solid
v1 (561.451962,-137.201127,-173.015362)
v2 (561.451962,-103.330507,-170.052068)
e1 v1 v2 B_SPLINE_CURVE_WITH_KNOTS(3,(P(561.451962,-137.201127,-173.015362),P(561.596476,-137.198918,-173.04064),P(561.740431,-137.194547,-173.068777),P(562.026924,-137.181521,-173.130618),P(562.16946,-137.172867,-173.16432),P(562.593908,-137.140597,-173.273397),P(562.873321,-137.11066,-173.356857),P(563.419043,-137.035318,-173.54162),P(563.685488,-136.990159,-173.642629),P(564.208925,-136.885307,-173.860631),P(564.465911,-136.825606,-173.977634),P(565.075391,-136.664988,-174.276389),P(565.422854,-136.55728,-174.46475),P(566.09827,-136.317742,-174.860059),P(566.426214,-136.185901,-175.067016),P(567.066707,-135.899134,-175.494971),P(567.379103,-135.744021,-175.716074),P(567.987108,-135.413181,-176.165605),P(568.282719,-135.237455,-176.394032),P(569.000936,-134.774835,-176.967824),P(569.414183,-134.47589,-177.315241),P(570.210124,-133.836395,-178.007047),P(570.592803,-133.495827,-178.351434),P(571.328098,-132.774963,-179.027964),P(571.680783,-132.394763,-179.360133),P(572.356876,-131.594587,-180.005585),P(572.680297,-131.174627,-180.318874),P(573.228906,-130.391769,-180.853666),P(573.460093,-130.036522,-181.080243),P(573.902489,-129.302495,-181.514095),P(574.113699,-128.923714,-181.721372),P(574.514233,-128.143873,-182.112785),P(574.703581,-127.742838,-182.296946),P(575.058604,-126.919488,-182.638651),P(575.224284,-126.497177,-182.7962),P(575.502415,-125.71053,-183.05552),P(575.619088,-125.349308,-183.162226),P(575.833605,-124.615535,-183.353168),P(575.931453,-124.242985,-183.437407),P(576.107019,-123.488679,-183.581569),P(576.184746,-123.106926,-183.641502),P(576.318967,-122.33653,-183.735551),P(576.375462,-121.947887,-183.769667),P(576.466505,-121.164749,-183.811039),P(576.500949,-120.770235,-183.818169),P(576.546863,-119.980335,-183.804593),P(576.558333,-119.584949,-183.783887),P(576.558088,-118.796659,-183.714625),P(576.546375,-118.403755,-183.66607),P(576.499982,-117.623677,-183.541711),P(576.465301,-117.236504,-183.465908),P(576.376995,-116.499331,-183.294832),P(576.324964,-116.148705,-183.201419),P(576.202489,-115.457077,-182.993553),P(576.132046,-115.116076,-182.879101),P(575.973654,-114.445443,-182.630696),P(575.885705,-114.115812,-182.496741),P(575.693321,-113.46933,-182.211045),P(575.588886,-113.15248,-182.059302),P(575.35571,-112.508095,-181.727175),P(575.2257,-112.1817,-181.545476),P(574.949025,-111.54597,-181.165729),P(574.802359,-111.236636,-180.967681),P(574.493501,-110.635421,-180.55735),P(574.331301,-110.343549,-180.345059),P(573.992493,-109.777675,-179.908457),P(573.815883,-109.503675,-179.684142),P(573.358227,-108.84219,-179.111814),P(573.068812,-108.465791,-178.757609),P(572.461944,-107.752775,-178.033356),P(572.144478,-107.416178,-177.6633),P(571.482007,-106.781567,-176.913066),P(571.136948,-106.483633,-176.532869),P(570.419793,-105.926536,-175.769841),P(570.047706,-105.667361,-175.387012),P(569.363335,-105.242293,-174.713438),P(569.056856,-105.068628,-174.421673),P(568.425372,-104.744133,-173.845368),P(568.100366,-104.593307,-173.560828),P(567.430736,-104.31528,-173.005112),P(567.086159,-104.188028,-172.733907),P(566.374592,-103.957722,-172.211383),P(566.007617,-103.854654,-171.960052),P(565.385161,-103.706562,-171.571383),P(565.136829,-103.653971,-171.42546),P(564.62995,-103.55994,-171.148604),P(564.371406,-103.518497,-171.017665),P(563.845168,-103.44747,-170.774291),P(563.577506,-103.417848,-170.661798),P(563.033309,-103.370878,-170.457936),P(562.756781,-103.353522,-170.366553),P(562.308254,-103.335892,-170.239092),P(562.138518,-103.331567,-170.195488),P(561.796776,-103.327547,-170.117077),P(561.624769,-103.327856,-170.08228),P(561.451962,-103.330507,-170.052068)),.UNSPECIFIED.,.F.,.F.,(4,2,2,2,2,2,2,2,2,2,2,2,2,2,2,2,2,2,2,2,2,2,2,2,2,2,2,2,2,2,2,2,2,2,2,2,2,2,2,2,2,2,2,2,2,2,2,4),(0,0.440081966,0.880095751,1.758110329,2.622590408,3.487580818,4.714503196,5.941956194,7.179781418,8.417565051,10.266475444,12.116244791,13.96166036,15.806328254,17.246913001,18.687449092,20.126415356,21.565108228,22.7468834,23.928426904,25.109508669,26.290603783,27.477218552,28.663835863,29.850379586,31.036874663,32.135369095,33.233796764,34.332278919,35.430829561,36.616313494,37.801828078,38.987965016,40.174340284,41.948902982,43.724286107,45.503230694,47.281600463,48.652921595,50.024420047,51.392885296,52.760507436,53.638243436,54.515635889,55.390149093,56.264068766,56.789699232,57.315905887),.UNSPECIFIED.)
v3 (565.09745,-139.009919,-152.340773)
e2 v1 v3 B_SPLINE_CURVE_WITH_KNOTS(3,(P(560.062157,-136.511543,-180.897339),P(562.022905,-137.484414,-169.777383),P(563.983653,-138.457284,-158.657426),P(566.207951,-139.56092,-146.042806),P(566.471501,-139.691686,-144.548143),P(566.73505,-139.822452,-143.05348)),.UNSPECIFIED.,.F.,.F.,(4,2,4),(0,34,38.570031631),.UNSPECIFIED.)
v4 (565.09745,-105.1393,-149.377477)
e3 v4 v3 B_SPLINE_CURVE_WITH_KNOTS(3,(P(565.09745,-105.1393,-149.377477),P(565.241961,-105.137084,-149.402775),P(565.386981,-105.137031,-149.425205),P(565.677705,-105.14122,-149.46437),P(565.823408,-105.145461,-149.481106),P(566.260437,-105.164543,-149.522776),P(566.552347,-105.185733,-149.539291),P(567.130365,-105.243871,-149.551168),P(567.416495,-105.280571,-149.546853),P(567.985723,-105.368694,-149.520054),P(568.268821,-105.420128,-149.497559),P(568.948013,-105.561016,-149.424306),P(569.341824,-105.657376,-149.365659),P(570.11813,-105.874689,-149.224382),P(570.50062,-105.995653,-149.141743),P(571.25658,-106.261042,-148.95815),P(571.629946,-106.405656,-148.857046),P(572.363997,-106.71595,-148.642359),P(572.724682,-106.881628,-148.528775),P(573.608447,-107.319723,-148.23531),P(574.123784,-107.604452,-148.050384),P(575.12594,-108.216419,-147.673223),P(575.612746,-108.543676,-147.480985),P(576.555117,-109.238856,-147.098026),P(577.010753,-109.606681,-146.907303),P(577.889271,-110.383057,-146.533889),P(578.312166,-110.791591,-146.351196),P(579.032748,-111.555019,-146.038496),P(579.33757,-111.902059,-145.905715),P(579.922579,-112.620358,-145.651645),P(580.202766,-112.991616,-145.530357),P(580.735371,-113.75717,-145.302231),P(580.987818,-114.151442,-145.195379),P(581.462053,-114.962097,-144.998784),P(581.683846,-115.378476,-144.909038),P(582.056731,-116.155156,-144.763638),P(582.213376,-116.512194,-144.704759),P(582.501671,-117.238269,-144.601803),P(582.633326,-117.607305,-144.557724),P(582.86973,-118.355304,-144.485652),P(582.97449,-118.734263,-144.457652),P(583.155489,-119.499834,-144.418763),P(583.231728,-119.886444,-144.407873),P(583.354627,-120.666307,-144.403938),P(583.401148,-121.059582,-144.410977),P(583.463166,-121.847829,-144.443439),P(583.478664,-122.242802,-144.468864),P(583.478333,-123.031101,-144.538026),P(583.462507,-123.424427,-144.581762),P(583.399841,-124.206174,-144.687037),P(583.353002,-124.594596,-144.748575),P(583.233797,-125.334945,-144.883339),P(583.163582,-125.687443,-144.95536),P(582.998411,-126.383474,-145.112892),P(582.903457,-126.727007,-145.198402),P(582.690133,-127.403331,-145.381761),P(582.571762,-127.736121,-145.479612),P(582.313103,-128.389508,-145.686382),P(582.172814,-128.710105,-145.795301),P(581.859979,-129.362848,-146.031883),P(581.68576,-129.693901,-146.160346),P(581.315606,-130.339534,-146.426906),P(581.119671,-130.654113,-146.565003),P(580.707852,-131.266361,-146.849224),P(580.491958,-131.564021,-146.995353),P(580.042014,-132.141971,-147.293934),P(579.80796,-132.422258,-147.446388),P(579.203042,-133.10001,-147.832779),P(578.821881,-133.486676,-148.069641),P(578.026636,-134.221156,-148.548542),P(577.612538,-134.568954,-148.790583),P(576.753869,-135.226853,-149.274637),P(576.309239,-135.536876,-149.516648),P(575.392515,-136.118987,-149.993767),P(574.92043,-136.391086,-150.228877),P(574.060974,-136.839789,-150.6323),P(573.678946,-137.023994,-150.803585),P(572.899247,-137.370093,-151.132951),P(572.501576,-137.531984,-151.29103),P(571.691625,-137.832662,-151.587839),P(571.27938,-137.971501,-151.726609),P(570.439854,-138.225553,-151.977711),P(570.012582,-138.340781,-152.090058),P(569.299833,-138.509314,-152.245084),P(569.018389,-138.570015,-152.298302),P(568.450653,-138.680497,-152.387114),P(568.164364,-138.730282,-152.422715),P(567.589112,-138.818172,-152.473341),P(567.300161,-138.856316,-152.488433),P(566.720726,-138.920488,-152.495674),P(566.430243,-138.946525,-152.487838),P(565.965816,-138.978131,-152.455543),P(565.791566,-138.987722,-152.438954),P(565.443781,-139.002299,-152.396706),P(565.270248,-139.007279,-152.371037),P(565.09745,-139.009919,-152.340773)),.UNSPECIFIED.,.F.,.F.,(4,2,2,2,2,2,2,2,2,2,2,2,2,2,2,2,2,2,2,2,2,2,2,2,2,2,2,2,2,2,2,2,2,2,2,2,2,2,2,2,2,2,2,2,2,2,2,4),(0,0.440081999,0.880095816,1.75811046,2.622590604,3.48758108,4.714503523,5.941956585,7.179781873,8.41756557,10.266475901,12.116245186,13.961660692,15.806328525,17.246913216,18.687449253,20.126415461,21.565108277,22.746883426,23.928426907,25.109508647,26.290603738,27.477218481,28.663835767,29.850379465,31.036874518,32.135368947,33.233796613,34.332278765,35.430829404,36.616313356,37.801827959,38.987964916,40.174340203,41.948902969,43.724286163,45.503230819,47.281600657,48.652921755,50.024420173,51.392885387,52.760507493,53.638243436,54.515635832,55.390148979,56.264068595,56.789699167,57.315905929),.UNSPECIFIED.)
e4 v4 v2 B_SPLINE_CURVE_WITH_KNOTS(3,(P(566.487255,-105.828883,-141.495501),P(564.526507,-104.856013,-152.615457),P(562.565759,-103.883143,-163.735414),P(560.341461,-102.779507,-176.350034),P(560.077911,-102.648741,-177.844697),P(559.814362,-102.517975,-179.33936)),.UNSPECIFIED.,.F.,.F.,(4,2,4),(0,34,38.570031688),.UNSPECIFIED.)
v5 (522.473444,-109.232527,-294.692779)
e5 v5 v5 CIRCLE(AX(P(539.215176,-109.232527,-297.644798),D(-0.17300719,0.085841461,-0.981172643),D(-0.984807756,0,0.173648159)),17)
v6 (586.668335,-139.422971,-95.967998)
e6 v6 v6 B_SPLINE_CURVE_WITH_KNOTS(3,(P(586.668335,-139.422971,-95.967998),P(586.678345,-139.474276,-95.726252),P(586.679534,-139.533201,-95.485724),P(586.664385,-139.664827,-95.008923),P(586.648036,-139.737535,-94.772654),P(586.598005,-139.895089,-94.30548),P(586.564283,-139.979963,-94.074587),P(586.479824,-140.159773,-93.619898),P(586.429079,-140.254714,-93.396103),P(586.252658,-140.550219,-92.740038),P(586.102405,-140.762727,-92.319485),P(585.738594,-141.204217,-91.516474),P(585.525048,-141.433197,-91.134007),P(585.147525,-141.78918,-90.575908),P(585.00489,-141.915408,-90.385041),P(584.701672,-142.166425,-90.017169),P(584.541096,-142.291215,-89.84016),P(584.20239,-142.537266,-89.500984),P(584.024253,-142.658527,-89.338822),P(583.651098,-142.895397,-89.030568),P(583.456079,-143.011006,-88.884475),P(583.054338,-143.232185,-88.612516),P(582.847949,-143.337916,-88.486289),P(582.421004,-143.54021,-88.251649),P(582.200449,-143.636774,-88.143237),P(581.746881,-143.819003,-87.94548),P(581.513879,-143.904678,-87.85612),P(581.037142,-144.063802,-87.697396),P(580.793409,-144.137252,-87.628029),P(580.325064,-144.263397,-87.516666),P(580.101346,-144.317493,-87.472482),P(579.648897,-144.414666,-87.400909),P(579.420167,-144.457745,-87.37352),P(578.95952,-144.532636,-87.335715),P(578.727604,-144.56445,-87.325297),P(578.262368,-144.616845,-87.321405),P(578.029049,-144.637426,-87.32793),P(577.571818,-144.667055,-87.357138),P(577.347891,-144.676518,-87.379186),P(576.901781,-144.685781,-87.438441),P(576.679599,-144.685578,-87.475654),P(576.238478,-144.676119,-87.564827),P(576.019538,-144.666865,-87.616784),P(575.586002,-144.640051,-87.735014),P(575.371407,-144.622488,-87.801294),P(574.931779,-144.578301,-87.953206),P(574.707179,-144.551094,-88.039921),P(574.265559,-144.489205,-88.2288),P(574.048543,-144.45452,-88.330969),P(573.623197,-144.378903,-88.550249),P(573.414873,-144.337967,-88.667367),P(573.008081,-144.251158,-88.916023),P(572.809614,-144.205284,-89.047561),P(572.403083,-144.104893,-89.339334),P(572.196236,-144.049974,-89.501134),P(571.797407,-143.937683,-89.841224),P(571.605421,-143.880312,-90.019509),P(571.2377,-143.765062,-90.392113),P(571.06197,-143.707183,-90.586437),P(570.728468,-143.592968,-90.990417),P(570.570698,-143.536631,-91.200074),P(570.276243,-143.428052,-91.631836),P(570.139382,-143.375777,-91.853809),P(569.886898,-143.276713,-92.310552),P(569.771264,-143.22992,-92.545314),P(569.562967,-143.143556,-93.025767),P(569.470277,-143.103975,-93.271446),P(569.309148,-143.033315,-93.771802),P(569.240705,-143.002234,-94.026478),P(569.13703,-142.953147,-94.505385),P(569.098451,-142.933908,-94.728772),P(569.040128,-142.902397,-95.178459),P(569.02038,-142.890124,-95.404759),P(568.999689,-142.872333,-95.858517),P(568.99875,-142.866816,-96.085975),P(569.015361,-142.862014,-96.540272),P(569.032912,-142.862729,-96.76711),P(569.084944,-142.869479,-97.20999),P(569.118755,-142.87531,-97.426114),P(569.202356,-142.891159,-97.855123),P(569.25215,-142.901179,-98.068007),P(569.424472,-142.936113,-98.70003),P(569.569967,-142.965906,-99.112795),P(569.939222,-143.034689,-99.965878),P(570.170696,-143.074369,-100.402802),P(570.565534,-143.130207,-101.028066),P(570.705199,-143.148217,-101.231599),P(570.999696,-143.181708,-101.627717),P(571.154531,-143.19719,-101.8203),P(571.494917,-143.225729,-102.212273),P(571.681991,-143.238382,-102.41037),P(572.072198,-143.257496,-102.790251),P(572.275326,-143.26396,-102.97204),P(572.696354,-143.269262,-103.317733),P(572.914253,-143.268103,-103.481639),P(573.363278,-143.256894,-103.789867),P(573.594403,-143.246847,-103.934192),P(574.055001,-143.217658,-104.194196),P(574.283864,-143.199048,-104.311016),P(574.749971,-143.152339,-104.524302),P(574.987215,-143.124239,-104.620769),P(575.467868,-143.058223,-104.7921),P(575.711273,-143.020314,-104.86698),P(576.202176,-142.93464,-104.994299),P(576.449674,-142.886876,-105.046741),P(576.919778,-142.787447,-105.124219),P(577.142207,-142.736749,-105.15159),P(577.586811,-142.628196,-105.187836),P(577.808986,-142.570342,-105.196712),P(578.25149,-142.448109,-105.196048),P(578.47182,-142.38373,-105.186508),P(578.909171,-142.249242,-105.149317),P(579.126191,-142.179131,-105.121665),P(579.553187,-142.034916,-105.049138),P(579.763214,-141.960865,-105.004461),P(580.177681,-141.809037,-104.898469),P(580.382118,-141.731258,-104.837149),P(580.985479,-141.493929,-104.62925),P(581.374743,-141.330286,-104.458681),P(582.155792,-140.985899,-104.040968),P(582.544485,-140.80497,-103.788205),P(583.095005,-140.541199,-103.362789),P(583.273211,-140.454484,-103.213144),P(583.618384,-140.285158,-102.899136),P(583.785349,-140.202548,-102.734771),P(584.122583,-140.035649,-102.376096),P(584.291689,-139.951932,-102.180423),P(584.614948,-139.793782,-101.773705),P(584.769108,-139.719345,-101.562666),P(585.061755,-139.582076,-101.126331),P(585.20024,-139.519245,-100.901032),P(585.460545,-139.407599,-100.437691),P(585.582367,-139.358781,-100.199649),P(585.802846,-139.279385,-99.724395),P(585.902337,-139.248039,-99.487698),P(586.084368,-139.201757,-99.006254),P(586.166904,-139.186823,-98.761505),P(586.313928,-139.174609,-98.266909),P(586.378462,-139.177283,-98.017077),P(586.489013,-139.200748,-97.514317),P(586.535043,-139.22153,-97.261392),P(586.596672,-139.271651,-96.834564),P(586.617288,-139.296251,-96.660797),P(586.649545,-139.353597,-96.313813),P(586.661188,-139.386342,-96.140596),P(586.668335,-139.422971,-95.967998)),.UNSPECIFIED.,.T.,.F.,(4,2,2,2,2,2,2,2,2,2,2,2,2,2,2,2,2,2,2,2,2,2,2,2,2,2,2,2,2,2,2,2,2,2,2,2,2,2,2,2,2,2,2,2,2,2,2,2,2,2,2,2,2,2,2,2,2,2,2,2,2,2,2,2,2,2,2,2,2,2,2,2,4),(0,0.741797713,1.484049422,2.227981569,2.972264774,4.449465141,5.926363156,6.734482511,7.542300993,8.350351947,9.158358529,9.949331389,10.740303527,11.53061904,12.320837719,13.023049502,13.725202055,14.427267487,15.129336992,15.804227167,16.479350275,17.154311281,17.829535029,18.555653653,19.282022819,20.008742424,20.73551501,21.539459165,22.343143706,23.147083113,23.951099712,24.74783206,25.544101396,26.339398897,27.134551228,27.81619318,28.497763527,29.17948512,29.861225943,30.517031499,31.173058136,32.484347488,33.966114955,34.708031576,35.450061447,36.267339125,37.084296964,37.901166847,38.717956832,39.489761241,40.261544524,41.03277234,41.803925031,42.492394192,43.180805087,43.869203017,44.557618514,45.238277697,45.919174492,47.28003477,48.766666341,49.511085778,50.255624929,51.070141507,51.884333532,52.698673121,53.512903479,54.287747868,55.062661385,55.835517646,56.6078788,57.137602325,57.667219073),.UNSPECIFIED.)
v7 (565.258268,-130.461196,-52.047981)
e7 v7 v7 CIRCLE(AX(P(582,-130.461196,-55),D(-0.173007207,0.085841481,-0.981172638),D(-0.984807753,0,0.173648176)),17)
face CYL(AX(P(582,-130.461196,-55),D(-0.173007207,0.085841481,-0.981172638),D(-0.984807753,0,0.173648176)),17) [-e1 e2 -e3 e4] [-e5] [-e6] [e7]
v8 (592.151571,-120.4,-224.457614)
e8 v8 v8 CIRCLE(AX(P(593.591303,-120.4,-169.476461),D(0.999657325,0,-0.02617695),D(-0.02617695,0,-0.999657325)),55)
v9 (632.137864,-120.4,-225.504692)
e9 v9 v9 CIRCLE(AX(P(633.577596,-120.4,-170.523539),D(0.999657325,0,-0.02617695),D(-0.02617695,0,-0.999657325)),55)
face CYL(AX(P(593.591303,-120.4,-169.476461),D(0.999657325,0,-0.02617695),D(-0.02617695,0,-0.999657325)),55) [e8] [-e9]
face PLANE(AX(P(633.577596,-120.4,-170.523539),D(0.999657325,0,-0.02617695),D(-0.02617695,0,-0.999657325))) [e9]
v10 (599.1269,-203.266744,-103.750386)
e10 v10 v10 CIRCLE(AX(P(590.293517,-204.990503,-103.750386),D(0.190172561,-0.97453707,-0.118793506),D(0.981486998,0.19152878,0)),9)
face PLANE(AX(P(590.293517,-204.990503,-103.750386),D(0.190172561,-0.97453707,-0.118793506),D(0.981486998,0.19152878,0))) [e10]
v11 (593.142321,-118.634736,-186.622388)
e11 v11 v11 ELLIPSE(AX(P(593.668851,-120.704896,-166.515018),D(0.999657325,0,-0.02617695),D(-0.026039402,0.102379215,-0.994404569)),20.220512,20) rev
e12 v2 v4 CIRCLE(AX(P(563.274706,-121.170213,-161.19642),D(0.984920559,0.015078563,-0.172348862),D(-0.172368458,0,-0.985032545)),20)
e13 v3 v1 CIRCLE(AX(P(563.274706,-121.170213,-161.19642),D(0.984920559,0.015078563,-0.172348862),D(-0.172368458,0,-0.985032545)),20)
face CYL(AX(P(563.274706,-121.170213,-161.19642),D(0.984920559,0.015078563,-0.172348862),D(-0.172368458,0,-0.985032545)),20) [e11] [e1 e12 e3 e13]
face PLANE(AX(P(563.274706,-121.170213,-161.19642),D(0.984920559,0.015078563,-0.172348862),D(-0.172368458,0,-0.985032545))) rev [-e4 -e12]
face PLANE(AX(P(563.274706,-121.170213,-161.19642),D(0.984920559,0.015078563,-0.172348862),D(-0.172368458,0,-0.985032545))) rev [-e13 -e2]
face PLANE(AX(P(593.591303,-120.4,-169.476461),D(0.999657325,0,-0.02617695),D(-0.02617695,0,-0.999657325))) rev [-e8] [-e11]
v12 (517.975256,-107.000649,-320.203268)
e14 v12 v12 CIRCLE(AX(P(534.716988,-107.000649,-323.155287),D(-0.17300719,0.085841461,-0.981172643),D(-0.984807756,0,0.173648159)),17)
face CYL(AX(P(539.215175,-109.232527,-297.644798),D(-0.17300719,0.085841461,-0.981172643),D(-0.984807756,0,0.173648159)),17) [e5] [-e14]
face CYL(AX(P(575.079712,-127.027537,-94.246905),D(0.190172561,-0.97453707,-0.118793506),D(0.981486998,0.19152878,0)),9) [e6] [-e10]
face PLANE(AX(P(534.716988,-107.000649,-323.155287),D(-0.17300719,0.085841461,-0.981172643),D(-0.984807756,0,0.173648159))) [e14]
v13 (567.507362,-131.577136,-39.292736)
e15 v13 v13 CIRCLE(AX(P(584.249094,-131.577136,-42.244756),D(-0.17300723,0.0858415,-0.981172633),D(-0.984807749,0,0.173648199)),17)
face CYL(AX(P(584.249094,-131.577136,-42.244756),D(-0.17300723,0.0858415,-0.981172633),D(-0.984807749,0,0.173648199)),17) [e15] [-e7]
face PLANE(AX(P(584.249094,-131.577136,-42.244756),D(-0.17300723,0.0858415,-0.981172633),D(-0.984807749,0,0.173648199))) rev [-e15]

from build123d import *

# Parameters (mm, degrees)
SUSP_FR_UCA_BALL_JOINT_PROFILE_R  = 17
SUSP_FR_LCA_BALL_JOINT_PROFILE_R  = 17
SUSP_FR_UPRIGHT_KINGPIN_START     = -189.376138003
SUSP_FR_UPRIGHT_KINGPIN_OUTLINE_R = 17
SUSP_FR_UPRIGHT_KINGPIN_DEPTH     = 234.300819272
SUSP_FR_UPRIGHT_SPINDLE_PROFILE_R = 20
SUSP_FR_UPRIGHT_ARM_PROFILE_R     = 9
SUSP_FR_HUB_PROFILE_R             = 55


# Read off the part's stored shape, not the designer's step: SUSP_FR_upright_kingpin
with BuildPart() as part:
    # SUSP_FR_UCA_ball_joint: sweep along a curve in space
    with BuildLine() as susp_fr_uca_ball_joint_path:
        Line((539.215175, -109.232527, -297.644798), (534.716988, -107.000649, -323.155287))
    # SUSP_FR_UCA_ball_joint profile (on start of the path) → SUSP_FR_UCA_ball_joint (sweep)
    with BuildSketch(Plane(origin=(539.215175, -109.232527, -297.644798), x_dir=(-0.9848077563247088, 0, 0.17364815888080395), z_dir=(-0.1730071904249639, 0.0858414606043016, -0.981172643168663))):
        Circle(SUSP_FR_UCA_BALL_JOINT_PROFILE_R)
    sweep(path=susp_fr_uca_ball_joint_path.line)


with BuildPart() as body_2:
    # SUSP_FR_LCA_ball_joint: sweep along a curve in space
    with BuildLine() as susp_fr_lca_ball_joint_path:
        Line((584.249094, -131.577136, -42.2447557), (579.750906, -129.345257, -67.7552443))
    # SUSP_FR_LCA_ball_joint profile (on start of the path) → SUSP_FR_LCA_ball_joint (sweep)
    with BuildSketch(Plane(origin=(584.249094, -131.577136, -42.2447557), x_dir=(-0.9848077492574088, 0, 0.17364819896145425), z_dir=(-0.17300722977562832, 0.08584149950700166, -0.9811726328265339))):
        Circle(SUSP_FR_LCA_BALL_JOINT_PROFILE_R)
    sweep(path=susp_fr_lca_ball_joint_path.line)


with BuildPart() as susp_fr_upright_kingpin_tool:
    # SUSP_FR_upright_kingpin outline → SUSP_FR_upright_kingpin (new body)
    with BuildSketch(Plane(origin=(0, 0, 0), x_dir=(0.9849205583589563, 0.01507857135321185, -0.17234886250807685), z_dir=(0.17300720713855208, -0.08584148118504255, 0.9811726384210254)).offset(SUSP_FR_UPRIGHT_KINGPIN_START)):
        with Locations((580.73578395, -134.758317541)):
            Circle(SUSP_FR_UPRIGHT_KINGPIN_OUTLINE_R)
    extrude(amount=SUSP_FR_UPRIGHT_KINGPIN_DEPTH)


with BuildPart() as part_1:
    add(part.part)


with BuildPart() as part_2:
    # SUSP_FR_upright_kingpin: joined with susp_fr_upright_kingpin_tool
    add(part_1.part.fuse(susp_fr_upright_kingpin_tool.part, body_2.part, tol=0.00001))

    # SUSP_FR_upright_spindle: sweep along a curve in space
    with BuildLine() as susp_fr_upright_spindle_path:
        Line((563.274706, -121.170213, -161.19642), (613.584449, -120.4, -170))
    # SUSP_FR_upright_spindle profile (on start of the path) → SUSP_FR_upright_spindle (sweep)
    with BuildSketch(Plane(origin=(563.274706, -121.170213, -161.19642), x_dir=(0.17236845779024892, 0, 0.9850325450252957), z_dir=(0.9849205586549441, 0.015078562779446367, -0.17234886156670431))):
        Circle(SUSP_FR_UPRIGHT_SPINDLE_PROFILE_R)
    sweep(path=susp_fr_upright_spindle_path.line)

    # SUSP_FR_upright_arm: sweep along a curve in space
    with BuildLine() as susp_fr_upright_arm_path:
        Line((575.079712, -127.027537, -94.2469055), (590.293517, -204.990503, -103.750386))
    # SUSP_FR_upright_arm profile (on start of the path) → SUSP_FR_upright_arm (sweep)
    with BuildSketch(Plane(origin=(575.079712, -127.027537, -94.2469055), x_dir=(-0.9814869975187847, -0.1915287803479187, 0), z_dir=(0.19017256143460165, -0.9745370695403799, -0.1187935055844866))):
        Circle(SUSP_FR_UPRIGHT_ARM_PROFILE_R)
    sweep(path=susp_fr_upright_arm_path.line)

    # SUSP_FR_hub: sweep along a curve in space
    with BuildLine() as susp_fr_hub_path:
        Line((593.591303, -120.4, -169.476461), (633.577596, -120.4, -170.523539))
    # SUSP_FR_hub profile (on start of the path) → SUSP_FR_hub (sweep)
    with BuildSketch(Plane(origin=(593.591303, -120.4, -169.476461), x_dir=(0.026176949998200826, 0, 0.9996573249312944), z_dir=(0.9996573249312944, 0, -0.026176949998200826))):
        Circle(SUSP_FR_HUB_PROFILE_R)
    sweep(path=susp_fr_hub_path.line)


solid = part_2.part
